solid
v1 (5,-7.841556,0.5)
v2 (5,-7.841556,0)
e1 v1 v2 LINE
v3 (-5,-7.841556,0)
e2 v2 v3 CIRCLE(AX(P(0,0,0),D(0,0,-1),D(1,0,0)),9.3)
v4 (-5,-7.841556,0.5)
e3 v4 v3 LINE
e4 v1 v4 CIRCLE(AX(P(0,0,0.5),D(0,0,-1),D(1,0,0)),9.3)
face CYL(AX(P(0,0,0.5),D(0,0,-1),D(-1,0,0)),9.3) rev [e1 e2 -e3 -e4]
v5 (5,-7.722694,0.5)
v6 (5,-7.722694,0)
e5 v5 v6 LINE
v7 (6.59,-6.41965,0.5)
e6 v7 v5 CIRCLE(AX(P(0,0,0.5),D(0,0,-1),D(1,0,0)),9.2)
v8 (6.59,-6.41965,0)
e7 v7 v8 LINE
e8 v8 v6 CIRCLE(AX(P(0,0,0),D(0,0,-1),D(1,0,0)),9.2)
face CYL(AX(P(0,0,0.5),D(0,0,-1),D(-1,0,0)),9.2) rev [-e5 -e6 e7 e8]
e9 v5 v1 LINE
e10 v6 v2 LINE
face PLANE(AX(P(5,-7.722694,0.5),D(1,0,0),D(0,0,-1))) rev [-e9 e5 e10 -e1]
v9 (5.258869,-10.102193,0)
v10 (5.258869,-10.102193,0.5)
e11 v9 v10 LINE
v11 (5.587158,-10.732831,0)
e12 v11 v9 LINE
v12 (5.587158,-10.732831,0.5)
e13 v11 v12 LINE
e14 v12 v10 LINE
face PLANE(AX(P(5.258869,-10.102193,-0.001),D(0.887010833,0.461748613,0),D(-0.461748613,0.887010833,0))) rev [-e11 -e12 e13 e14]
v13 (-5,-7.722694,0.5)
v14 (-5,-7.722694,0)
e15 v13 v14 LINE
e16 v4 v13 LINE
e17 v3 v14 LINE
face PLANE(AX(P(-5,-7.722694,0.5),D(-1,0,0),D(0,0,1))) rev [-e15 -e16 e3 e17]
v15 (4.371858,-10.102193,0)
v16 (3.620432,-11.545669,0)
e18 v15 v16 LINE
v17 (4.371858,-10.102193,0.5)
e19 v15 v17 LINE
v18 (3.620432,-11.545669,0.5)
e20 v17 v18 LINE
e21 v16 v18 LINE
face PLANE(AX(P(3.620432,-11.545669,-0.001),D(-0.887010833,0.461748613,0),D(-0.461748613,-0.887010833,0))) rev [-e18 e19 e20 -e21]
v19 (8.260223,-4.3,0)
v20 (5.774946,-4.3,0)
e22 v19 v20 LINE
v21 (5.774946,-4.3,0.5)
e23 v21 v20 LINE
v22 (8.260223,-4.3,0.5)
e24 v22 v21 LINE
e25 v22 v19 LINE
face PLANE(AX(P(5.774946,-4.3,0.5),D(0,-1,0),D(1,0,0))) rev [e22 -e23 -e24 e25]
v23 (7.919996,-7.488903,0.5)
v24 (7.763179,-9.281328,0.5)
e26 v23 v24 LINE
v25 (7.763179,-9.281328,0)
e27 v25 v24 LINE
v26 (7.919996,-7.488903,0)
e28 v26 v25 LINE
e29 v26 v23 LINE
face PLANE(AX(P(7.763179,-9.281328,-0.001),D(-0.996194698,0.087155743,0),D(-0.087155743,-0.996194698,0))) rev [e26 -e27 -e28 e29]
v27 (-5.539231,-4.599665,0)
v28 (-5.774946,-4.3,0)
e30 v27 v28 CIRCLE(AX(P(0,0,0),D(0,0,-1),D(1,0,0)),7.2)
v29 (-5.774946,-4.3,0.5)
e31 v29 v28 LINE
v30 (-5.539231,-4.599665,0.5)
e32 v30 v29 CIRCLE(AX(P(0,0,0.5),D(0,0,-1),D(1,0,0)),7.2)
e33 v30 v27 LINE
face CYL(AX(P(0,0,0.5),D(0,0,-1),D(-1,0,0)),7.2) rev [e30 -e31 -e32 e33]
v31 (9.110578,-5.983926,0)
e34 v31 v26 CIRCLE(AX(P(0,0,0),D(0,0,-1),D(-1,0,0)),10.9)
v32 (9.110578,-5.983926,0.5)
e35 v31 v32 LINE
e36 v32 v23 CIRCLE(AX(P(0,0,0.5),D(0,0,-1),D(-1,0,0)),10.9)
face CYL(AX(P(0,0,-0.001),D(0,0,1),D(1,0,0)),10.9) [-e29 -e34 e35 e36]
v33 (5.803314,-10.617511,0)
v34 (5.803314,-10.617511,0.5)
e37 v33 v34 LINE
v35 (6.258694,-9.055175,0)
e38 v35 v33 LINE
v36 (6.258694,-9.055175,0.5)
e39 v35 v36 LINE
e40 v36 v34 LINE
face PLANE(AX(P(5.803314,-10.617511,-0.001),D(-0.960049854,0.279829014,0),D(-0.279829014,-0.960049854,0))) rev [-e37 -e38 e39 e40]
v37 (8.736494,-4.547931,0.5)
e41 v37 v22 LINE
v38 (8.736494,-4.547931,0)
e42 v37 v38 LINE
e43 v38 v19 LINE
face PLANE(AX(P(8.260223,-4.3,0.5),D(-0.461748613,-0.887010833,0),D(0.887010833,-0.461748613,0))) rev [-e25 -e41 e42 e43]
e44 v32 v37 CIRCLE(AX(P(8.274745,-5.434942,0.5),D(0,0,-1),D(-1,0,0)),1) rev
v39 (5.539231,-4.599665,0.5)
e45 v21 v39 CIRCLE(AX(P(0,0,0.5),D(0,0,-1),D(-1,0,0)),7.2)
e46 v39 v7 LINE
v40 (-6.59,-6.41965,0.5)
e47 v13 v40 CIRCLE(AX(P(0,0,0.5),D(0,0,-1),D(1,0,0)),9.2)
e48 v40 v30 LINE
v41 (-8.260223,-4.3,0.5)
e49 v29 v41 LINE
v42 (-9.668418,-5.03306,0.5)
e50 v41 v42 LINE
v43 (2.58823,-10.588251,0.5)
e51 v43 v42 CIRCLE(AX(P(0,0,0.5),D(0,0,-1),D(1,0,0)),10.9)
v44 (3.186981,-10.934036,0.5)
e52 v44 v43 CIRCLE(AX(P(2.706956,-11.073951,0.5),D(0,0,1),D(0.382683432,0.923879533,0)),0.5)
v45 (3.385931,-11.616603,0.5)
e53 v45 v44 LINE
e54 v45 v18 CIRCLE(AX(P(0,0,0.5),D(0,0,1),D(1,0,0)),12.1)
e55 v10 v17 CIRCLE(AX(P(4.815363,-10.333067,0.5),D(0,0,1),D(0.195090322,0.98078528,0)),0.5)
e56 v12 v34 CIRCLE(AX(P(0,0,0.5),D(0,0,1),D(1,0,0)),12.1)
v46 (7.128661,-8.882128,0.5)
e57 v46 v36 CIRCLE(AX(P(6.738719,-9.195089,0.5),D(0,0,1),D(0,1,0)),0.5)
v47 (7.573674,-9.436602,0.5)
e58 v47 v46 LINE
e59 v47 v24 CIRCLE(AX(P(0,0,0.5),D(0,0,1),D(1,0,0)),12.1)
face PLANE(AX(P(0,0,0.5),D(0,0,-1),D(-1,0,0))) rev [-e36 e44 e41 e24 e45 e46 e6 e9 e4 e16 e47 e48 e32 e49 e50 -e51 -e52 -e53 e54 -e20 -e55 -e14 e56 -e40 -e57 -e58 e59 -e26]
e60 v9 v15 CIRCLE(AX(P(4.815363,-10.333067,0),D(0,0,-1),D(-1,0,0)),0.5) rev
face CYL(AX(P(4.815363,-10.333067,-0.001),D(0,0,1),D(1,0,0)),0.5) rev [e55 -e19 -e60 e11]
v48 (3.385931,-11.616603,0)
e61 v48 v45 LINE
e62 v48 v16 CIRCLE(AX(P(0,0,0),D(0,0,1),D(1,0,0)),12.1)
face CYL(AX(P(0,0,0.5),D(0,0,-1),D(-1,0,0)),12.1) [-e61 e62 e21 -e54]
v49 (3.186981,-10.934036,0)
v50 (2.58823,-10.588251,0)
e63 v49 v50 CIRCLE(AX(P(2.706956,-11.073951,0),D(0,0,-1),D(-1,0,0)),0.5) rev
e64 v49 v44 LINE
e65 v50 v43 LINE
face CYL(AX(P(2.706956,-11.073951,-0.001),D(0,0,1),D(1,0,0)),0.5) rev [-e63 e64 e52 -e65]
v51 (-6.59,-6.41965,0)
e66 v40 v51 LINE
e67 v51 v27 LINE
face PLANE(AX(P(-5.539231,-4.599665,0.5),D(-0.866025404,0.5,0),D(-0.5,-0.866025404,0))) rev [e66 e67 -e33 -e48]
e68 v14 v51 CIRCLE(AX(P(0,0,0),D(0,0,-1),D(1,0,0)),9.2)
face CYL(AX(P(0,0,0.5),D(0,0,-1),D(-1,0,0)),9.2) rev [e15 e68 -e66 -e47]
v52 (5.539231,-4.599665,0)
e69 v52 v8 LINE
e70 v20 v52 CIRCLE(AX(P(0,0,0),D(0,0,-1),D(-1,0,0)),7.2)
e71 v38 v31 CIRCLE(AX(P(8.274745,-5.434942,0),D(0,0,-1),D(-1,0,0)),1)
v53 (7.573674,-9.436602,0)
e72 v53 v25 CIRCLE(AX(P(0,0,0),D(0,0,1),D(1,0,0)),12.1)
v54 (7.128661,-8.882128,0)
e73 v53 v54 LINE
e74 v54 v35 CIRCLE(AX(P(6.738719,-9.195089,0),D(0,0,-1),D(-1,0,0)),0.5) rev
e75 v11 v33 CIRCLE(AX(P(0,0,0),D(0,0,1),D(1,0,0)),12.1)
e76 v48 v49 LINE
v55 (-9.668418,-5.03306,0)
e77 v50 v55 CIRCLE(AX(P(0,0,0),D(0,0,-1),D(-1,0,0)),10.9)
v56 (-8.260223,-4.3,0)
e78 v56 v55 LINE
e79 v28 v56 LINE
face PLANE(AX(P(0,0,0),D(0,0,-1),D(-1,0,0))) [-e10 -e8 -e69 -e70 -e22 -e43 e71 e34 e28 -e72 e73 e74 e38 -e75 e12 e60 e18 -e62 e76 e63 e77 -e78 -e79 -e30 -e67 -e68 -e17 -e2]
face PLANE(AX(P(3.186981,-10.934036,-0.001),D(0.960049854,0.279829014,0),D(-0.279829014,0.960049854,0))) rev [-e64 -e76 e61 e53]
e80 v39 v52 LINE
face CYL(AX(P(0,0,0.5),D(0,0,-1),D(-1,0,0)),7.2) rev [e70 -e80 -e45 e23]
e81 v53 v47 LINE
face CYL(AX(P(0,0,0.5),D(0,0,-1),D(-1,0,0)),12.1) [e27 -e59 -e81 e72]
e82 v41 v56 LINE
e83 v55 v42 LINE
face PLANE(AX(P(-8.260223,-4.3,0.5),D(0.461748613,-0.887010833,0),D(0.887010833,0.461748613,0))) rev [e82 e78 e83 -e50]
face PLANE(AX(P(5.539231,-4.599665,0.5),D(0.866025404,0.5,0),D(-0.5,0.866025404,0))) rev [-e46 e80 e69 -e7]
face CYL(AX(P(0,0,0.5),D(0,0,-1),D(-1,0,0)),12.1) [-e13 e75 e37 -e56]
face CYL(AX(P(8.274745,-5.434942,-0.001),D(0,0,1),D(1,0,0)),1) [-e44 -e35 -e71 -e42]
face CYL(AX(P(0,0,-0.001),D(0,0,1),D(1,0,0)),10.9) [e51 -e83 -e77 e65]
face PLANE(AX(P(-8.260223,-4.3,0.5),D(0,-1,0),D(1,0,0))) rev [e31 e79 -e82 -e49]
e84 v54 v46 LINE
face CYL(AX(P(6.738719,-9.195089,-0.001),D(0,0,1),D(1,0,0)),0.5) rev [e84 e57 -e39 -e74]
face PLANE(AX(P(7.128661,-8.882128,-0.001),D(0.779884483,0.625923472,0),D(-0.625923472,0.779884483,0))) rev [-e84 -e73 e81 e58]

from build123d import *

# Parameters (mm, degrees)
OTHER_10076_5_DEPTH = 0.5
CUT_EXTRUDE1_START  = -0.5
CUT_EXTRUDE1_DEPTH  = 0.5


# Read off the part's stored shape, not the designer's step: 10076-5
with BuildPart() as part:
    # Other 10076-5 outline → Other 10076-5 (new body)
    with BuildSketch(Plane.XY):
        with BuildLine():
            ThreePointArc((7.573674013, -9.436602245), (7.668819519, -9.359444812), (7.763179028, -9.281328104))
            Line((7.763179028, -9.281328104), (7.919995926, -7.488902759))
            ThreePointArc((7.919995926, -7.488902759), (8.548470738, -6.76266575), (9.110578105, -5.983925684))
            ThreePointArc((9.110578105, -5.983925684), (9.242448569, -5.182849851), (8.736493865, -4.547930843))
            Line((8.736493865, -4.547930843), (8.260223146, -4.3))
            Line((8.260223146, -4.3), (5.774945887, -4.3))
            ThreePointArc((5.774945887, -4.3), (5.659072475, -4.451392897), (5.53923133, -4.5996648))
            Line((5.53923133, -4.5996648), (6.59, -6.419649523))
            ThreePointArc((6.59, -6.419649523), (5.831509763, -7.1157216), (5, -7.722693831))
            Line((5, -7.722693831), (5, -7.841555968))
            ThreePointArc((5, -7.841555968), (0, -9.3), (-5, -7.841555968))
            Line((-5, -7.841555968), (-5, -7.722693831))
            ThreePointArc((-5, -7.722693831), (-5.831509763, -7.1157216), (-6.59, -6.419649523))
            Line((-6.59, -6.419649523), (-5.53923133, -4.5996648))
            ThreePointArc((-5.53923133, -4.5996648), (-5.659072475, -4.451392897), (-5.774945887, -4.3))
            Line((-5.774945887, -4.3), (-8.260223146, -4.3))
            Line((-8.260223146, -4.3), (-10.732831081, -5.58715822))
            ThreePointArc((-10.732831081, -5.58715822), (-10.675718173, -5.6955282), (-10.617511084, -5.803314431))
            Line((-10.617511084, -5.803314431), (-9.055174855, -6.258693914))
            ThreePointArc((-9.055174855, -6.258693914), (-8.704696722, -6.64117368), (-8.882127626, -7.128661083))
            Line((-8.882127626, -7.128661083), (-9.436602245, -7.573674013))
            ThreePointArc((-9.436602245, -7.573674013), (-9.359444812, -7.668819519), (-9.281328104, -7.763179028))
            Line((-9.281328104, -7.763179028), (-7.660171598, -7.905011844))
            ThreePointArc((-7.660171598, -7.905011844), (-7.241809703, -8.211767477), (-7.320727248, -8.724502998))
            Line((-7.320727248, -8.724502998), (-7.777730077, -9.269137762))
            ThreePointArc((-7.777730077, -9.269137762), (-7.683493234, -9.347402405), (-7.588468891, -9.424709008))
            Line((-7.588468891, -9.424709008), (-5.970792243, -9.247544602))
            ThreePointArc((-5.970792243, -9.247544602), (-5.500623999, -9.466787654), (-5.477995427, -9.985067155))
            Line((-5.477995427, -9.985067155), (-5.819964104, -10.608393744))
            ThreePointArc((-5.819964104, -10.608393744), (-5.712269322, -10.666769858), (-5.603989074, -10.724052707))
            Line((-5.603989074, -10.724052707), (-4.05195869, -10.234699407))
            ThreePointArc((-4.05195869, -10.234699407), (-3.548052399, -10.358004491), (-3.424747314, -10.861910782))
            Line((-3.424747314, -10.861910782), (-3.638540174, -11.539975104))
            ThreePointArc((-3.638540174, -11.539975104), (-3.521526102, -11.576219327), (-3.404151099, -11.611277074))
            Line((-3.404151099, -11.611277074), (-1.977410637, -10.828540453))
            ThreePointArc((-1.977410637, -10.828540453), (-1.459131136, -10.851169025), (-1.239888083, -11.321337268))
            Line((-1.239888083, -11.321337268), (-1.317289186, -12.028081692))
            ThreePointArc((-1.317289186, -12.028081692), (-1.195452609, -12.04080118), (-1.073493507, -12.052286575))
            Line((-1.073493507, -12.052286575), (0.173128198, -11.006246762))
            ThreePointArc((0.173128198, -11.006246762), (0.685863719, -10.927329218), (0.992619352, -11.345691113))
            Line((0.992619352, -11.345691113), (1.054584487, -12.053955847))
            ThreePointArc((1.054584487, -12.053955847), (1.176561457, -12.042661796), (1.298417839, -12.030133462))
            Line((1.298417839, -12.030133462), (2.317013814, -10.760989181))
            ThreePointArc((2.317013814, -10.760989181), (2.804501216, -10.583558277), (3.186980982, -10.93403641))
            Line((3.186980982, -10.93403641), (3.38593107, -11.616603238))
            ThreePointArc((3.38593107, -11.616603238), (3.503360927, -11.581729673), (3.620431715, -11.545669067))
            Line((3.620431715, -11.545669067), (4.371857887, -10.10219282))
            ThreePointArc((4.371857887, -10.10219282), (4.815363304, -9.833067127), (5.258868721, -10.10219282))
            Line((5.258868721, -10.10219282), (5.58715822, -10.732831081))
            ThreePointArc((5.58715822, -10.732831081), (5.6955282, -10.675718173), (5.803314431, -10.617511084))
            Line((5.803314431, -10.617511084), (6.258693914, -9.055174855))
            ThreePointArc((6.258693914, -9.055174855), (6.64117368, -8.704696722), (7.128661083, -8.882127626))
            Line((7.128661083, -8.882127626), (7.573674013, -9.436602245))
        make_face()
    extrude(amount=OTHER_10076_5_DEPTH)

    # Sketch1 → Cut-Extrude1 (cut)
    with BuildSketch(Plane.XY.offset(0.5).offset(CUT_EXTRUDE1_START)):
        with BuildLine():
            Line((-9.668418082, -5.033059884), (-10.732831081, -5.58715822))
            ThreePointArc((-10.732831081, -5.58715822), (-5.712269321, -10.666769858), (1.298417839, -12.030133462))
            Line((1.298417839, -12.030133462), (2.317013814, -10.760989181))
            ThreePointArc((2.317013814, -10.760989181), (2.43835696, -10.652222893), (2.588229912, -10.588251316))
            ThreePointArc((2.588229912, -10.588251316), (-4.499700444, -9.927874693), (-9.668418082, -5.033059884))
        make_face()
    extrude(amount=CUT_EXTRUDE1_DEPTH, mode=Mode.SUBTRACT)


solid = part.part
